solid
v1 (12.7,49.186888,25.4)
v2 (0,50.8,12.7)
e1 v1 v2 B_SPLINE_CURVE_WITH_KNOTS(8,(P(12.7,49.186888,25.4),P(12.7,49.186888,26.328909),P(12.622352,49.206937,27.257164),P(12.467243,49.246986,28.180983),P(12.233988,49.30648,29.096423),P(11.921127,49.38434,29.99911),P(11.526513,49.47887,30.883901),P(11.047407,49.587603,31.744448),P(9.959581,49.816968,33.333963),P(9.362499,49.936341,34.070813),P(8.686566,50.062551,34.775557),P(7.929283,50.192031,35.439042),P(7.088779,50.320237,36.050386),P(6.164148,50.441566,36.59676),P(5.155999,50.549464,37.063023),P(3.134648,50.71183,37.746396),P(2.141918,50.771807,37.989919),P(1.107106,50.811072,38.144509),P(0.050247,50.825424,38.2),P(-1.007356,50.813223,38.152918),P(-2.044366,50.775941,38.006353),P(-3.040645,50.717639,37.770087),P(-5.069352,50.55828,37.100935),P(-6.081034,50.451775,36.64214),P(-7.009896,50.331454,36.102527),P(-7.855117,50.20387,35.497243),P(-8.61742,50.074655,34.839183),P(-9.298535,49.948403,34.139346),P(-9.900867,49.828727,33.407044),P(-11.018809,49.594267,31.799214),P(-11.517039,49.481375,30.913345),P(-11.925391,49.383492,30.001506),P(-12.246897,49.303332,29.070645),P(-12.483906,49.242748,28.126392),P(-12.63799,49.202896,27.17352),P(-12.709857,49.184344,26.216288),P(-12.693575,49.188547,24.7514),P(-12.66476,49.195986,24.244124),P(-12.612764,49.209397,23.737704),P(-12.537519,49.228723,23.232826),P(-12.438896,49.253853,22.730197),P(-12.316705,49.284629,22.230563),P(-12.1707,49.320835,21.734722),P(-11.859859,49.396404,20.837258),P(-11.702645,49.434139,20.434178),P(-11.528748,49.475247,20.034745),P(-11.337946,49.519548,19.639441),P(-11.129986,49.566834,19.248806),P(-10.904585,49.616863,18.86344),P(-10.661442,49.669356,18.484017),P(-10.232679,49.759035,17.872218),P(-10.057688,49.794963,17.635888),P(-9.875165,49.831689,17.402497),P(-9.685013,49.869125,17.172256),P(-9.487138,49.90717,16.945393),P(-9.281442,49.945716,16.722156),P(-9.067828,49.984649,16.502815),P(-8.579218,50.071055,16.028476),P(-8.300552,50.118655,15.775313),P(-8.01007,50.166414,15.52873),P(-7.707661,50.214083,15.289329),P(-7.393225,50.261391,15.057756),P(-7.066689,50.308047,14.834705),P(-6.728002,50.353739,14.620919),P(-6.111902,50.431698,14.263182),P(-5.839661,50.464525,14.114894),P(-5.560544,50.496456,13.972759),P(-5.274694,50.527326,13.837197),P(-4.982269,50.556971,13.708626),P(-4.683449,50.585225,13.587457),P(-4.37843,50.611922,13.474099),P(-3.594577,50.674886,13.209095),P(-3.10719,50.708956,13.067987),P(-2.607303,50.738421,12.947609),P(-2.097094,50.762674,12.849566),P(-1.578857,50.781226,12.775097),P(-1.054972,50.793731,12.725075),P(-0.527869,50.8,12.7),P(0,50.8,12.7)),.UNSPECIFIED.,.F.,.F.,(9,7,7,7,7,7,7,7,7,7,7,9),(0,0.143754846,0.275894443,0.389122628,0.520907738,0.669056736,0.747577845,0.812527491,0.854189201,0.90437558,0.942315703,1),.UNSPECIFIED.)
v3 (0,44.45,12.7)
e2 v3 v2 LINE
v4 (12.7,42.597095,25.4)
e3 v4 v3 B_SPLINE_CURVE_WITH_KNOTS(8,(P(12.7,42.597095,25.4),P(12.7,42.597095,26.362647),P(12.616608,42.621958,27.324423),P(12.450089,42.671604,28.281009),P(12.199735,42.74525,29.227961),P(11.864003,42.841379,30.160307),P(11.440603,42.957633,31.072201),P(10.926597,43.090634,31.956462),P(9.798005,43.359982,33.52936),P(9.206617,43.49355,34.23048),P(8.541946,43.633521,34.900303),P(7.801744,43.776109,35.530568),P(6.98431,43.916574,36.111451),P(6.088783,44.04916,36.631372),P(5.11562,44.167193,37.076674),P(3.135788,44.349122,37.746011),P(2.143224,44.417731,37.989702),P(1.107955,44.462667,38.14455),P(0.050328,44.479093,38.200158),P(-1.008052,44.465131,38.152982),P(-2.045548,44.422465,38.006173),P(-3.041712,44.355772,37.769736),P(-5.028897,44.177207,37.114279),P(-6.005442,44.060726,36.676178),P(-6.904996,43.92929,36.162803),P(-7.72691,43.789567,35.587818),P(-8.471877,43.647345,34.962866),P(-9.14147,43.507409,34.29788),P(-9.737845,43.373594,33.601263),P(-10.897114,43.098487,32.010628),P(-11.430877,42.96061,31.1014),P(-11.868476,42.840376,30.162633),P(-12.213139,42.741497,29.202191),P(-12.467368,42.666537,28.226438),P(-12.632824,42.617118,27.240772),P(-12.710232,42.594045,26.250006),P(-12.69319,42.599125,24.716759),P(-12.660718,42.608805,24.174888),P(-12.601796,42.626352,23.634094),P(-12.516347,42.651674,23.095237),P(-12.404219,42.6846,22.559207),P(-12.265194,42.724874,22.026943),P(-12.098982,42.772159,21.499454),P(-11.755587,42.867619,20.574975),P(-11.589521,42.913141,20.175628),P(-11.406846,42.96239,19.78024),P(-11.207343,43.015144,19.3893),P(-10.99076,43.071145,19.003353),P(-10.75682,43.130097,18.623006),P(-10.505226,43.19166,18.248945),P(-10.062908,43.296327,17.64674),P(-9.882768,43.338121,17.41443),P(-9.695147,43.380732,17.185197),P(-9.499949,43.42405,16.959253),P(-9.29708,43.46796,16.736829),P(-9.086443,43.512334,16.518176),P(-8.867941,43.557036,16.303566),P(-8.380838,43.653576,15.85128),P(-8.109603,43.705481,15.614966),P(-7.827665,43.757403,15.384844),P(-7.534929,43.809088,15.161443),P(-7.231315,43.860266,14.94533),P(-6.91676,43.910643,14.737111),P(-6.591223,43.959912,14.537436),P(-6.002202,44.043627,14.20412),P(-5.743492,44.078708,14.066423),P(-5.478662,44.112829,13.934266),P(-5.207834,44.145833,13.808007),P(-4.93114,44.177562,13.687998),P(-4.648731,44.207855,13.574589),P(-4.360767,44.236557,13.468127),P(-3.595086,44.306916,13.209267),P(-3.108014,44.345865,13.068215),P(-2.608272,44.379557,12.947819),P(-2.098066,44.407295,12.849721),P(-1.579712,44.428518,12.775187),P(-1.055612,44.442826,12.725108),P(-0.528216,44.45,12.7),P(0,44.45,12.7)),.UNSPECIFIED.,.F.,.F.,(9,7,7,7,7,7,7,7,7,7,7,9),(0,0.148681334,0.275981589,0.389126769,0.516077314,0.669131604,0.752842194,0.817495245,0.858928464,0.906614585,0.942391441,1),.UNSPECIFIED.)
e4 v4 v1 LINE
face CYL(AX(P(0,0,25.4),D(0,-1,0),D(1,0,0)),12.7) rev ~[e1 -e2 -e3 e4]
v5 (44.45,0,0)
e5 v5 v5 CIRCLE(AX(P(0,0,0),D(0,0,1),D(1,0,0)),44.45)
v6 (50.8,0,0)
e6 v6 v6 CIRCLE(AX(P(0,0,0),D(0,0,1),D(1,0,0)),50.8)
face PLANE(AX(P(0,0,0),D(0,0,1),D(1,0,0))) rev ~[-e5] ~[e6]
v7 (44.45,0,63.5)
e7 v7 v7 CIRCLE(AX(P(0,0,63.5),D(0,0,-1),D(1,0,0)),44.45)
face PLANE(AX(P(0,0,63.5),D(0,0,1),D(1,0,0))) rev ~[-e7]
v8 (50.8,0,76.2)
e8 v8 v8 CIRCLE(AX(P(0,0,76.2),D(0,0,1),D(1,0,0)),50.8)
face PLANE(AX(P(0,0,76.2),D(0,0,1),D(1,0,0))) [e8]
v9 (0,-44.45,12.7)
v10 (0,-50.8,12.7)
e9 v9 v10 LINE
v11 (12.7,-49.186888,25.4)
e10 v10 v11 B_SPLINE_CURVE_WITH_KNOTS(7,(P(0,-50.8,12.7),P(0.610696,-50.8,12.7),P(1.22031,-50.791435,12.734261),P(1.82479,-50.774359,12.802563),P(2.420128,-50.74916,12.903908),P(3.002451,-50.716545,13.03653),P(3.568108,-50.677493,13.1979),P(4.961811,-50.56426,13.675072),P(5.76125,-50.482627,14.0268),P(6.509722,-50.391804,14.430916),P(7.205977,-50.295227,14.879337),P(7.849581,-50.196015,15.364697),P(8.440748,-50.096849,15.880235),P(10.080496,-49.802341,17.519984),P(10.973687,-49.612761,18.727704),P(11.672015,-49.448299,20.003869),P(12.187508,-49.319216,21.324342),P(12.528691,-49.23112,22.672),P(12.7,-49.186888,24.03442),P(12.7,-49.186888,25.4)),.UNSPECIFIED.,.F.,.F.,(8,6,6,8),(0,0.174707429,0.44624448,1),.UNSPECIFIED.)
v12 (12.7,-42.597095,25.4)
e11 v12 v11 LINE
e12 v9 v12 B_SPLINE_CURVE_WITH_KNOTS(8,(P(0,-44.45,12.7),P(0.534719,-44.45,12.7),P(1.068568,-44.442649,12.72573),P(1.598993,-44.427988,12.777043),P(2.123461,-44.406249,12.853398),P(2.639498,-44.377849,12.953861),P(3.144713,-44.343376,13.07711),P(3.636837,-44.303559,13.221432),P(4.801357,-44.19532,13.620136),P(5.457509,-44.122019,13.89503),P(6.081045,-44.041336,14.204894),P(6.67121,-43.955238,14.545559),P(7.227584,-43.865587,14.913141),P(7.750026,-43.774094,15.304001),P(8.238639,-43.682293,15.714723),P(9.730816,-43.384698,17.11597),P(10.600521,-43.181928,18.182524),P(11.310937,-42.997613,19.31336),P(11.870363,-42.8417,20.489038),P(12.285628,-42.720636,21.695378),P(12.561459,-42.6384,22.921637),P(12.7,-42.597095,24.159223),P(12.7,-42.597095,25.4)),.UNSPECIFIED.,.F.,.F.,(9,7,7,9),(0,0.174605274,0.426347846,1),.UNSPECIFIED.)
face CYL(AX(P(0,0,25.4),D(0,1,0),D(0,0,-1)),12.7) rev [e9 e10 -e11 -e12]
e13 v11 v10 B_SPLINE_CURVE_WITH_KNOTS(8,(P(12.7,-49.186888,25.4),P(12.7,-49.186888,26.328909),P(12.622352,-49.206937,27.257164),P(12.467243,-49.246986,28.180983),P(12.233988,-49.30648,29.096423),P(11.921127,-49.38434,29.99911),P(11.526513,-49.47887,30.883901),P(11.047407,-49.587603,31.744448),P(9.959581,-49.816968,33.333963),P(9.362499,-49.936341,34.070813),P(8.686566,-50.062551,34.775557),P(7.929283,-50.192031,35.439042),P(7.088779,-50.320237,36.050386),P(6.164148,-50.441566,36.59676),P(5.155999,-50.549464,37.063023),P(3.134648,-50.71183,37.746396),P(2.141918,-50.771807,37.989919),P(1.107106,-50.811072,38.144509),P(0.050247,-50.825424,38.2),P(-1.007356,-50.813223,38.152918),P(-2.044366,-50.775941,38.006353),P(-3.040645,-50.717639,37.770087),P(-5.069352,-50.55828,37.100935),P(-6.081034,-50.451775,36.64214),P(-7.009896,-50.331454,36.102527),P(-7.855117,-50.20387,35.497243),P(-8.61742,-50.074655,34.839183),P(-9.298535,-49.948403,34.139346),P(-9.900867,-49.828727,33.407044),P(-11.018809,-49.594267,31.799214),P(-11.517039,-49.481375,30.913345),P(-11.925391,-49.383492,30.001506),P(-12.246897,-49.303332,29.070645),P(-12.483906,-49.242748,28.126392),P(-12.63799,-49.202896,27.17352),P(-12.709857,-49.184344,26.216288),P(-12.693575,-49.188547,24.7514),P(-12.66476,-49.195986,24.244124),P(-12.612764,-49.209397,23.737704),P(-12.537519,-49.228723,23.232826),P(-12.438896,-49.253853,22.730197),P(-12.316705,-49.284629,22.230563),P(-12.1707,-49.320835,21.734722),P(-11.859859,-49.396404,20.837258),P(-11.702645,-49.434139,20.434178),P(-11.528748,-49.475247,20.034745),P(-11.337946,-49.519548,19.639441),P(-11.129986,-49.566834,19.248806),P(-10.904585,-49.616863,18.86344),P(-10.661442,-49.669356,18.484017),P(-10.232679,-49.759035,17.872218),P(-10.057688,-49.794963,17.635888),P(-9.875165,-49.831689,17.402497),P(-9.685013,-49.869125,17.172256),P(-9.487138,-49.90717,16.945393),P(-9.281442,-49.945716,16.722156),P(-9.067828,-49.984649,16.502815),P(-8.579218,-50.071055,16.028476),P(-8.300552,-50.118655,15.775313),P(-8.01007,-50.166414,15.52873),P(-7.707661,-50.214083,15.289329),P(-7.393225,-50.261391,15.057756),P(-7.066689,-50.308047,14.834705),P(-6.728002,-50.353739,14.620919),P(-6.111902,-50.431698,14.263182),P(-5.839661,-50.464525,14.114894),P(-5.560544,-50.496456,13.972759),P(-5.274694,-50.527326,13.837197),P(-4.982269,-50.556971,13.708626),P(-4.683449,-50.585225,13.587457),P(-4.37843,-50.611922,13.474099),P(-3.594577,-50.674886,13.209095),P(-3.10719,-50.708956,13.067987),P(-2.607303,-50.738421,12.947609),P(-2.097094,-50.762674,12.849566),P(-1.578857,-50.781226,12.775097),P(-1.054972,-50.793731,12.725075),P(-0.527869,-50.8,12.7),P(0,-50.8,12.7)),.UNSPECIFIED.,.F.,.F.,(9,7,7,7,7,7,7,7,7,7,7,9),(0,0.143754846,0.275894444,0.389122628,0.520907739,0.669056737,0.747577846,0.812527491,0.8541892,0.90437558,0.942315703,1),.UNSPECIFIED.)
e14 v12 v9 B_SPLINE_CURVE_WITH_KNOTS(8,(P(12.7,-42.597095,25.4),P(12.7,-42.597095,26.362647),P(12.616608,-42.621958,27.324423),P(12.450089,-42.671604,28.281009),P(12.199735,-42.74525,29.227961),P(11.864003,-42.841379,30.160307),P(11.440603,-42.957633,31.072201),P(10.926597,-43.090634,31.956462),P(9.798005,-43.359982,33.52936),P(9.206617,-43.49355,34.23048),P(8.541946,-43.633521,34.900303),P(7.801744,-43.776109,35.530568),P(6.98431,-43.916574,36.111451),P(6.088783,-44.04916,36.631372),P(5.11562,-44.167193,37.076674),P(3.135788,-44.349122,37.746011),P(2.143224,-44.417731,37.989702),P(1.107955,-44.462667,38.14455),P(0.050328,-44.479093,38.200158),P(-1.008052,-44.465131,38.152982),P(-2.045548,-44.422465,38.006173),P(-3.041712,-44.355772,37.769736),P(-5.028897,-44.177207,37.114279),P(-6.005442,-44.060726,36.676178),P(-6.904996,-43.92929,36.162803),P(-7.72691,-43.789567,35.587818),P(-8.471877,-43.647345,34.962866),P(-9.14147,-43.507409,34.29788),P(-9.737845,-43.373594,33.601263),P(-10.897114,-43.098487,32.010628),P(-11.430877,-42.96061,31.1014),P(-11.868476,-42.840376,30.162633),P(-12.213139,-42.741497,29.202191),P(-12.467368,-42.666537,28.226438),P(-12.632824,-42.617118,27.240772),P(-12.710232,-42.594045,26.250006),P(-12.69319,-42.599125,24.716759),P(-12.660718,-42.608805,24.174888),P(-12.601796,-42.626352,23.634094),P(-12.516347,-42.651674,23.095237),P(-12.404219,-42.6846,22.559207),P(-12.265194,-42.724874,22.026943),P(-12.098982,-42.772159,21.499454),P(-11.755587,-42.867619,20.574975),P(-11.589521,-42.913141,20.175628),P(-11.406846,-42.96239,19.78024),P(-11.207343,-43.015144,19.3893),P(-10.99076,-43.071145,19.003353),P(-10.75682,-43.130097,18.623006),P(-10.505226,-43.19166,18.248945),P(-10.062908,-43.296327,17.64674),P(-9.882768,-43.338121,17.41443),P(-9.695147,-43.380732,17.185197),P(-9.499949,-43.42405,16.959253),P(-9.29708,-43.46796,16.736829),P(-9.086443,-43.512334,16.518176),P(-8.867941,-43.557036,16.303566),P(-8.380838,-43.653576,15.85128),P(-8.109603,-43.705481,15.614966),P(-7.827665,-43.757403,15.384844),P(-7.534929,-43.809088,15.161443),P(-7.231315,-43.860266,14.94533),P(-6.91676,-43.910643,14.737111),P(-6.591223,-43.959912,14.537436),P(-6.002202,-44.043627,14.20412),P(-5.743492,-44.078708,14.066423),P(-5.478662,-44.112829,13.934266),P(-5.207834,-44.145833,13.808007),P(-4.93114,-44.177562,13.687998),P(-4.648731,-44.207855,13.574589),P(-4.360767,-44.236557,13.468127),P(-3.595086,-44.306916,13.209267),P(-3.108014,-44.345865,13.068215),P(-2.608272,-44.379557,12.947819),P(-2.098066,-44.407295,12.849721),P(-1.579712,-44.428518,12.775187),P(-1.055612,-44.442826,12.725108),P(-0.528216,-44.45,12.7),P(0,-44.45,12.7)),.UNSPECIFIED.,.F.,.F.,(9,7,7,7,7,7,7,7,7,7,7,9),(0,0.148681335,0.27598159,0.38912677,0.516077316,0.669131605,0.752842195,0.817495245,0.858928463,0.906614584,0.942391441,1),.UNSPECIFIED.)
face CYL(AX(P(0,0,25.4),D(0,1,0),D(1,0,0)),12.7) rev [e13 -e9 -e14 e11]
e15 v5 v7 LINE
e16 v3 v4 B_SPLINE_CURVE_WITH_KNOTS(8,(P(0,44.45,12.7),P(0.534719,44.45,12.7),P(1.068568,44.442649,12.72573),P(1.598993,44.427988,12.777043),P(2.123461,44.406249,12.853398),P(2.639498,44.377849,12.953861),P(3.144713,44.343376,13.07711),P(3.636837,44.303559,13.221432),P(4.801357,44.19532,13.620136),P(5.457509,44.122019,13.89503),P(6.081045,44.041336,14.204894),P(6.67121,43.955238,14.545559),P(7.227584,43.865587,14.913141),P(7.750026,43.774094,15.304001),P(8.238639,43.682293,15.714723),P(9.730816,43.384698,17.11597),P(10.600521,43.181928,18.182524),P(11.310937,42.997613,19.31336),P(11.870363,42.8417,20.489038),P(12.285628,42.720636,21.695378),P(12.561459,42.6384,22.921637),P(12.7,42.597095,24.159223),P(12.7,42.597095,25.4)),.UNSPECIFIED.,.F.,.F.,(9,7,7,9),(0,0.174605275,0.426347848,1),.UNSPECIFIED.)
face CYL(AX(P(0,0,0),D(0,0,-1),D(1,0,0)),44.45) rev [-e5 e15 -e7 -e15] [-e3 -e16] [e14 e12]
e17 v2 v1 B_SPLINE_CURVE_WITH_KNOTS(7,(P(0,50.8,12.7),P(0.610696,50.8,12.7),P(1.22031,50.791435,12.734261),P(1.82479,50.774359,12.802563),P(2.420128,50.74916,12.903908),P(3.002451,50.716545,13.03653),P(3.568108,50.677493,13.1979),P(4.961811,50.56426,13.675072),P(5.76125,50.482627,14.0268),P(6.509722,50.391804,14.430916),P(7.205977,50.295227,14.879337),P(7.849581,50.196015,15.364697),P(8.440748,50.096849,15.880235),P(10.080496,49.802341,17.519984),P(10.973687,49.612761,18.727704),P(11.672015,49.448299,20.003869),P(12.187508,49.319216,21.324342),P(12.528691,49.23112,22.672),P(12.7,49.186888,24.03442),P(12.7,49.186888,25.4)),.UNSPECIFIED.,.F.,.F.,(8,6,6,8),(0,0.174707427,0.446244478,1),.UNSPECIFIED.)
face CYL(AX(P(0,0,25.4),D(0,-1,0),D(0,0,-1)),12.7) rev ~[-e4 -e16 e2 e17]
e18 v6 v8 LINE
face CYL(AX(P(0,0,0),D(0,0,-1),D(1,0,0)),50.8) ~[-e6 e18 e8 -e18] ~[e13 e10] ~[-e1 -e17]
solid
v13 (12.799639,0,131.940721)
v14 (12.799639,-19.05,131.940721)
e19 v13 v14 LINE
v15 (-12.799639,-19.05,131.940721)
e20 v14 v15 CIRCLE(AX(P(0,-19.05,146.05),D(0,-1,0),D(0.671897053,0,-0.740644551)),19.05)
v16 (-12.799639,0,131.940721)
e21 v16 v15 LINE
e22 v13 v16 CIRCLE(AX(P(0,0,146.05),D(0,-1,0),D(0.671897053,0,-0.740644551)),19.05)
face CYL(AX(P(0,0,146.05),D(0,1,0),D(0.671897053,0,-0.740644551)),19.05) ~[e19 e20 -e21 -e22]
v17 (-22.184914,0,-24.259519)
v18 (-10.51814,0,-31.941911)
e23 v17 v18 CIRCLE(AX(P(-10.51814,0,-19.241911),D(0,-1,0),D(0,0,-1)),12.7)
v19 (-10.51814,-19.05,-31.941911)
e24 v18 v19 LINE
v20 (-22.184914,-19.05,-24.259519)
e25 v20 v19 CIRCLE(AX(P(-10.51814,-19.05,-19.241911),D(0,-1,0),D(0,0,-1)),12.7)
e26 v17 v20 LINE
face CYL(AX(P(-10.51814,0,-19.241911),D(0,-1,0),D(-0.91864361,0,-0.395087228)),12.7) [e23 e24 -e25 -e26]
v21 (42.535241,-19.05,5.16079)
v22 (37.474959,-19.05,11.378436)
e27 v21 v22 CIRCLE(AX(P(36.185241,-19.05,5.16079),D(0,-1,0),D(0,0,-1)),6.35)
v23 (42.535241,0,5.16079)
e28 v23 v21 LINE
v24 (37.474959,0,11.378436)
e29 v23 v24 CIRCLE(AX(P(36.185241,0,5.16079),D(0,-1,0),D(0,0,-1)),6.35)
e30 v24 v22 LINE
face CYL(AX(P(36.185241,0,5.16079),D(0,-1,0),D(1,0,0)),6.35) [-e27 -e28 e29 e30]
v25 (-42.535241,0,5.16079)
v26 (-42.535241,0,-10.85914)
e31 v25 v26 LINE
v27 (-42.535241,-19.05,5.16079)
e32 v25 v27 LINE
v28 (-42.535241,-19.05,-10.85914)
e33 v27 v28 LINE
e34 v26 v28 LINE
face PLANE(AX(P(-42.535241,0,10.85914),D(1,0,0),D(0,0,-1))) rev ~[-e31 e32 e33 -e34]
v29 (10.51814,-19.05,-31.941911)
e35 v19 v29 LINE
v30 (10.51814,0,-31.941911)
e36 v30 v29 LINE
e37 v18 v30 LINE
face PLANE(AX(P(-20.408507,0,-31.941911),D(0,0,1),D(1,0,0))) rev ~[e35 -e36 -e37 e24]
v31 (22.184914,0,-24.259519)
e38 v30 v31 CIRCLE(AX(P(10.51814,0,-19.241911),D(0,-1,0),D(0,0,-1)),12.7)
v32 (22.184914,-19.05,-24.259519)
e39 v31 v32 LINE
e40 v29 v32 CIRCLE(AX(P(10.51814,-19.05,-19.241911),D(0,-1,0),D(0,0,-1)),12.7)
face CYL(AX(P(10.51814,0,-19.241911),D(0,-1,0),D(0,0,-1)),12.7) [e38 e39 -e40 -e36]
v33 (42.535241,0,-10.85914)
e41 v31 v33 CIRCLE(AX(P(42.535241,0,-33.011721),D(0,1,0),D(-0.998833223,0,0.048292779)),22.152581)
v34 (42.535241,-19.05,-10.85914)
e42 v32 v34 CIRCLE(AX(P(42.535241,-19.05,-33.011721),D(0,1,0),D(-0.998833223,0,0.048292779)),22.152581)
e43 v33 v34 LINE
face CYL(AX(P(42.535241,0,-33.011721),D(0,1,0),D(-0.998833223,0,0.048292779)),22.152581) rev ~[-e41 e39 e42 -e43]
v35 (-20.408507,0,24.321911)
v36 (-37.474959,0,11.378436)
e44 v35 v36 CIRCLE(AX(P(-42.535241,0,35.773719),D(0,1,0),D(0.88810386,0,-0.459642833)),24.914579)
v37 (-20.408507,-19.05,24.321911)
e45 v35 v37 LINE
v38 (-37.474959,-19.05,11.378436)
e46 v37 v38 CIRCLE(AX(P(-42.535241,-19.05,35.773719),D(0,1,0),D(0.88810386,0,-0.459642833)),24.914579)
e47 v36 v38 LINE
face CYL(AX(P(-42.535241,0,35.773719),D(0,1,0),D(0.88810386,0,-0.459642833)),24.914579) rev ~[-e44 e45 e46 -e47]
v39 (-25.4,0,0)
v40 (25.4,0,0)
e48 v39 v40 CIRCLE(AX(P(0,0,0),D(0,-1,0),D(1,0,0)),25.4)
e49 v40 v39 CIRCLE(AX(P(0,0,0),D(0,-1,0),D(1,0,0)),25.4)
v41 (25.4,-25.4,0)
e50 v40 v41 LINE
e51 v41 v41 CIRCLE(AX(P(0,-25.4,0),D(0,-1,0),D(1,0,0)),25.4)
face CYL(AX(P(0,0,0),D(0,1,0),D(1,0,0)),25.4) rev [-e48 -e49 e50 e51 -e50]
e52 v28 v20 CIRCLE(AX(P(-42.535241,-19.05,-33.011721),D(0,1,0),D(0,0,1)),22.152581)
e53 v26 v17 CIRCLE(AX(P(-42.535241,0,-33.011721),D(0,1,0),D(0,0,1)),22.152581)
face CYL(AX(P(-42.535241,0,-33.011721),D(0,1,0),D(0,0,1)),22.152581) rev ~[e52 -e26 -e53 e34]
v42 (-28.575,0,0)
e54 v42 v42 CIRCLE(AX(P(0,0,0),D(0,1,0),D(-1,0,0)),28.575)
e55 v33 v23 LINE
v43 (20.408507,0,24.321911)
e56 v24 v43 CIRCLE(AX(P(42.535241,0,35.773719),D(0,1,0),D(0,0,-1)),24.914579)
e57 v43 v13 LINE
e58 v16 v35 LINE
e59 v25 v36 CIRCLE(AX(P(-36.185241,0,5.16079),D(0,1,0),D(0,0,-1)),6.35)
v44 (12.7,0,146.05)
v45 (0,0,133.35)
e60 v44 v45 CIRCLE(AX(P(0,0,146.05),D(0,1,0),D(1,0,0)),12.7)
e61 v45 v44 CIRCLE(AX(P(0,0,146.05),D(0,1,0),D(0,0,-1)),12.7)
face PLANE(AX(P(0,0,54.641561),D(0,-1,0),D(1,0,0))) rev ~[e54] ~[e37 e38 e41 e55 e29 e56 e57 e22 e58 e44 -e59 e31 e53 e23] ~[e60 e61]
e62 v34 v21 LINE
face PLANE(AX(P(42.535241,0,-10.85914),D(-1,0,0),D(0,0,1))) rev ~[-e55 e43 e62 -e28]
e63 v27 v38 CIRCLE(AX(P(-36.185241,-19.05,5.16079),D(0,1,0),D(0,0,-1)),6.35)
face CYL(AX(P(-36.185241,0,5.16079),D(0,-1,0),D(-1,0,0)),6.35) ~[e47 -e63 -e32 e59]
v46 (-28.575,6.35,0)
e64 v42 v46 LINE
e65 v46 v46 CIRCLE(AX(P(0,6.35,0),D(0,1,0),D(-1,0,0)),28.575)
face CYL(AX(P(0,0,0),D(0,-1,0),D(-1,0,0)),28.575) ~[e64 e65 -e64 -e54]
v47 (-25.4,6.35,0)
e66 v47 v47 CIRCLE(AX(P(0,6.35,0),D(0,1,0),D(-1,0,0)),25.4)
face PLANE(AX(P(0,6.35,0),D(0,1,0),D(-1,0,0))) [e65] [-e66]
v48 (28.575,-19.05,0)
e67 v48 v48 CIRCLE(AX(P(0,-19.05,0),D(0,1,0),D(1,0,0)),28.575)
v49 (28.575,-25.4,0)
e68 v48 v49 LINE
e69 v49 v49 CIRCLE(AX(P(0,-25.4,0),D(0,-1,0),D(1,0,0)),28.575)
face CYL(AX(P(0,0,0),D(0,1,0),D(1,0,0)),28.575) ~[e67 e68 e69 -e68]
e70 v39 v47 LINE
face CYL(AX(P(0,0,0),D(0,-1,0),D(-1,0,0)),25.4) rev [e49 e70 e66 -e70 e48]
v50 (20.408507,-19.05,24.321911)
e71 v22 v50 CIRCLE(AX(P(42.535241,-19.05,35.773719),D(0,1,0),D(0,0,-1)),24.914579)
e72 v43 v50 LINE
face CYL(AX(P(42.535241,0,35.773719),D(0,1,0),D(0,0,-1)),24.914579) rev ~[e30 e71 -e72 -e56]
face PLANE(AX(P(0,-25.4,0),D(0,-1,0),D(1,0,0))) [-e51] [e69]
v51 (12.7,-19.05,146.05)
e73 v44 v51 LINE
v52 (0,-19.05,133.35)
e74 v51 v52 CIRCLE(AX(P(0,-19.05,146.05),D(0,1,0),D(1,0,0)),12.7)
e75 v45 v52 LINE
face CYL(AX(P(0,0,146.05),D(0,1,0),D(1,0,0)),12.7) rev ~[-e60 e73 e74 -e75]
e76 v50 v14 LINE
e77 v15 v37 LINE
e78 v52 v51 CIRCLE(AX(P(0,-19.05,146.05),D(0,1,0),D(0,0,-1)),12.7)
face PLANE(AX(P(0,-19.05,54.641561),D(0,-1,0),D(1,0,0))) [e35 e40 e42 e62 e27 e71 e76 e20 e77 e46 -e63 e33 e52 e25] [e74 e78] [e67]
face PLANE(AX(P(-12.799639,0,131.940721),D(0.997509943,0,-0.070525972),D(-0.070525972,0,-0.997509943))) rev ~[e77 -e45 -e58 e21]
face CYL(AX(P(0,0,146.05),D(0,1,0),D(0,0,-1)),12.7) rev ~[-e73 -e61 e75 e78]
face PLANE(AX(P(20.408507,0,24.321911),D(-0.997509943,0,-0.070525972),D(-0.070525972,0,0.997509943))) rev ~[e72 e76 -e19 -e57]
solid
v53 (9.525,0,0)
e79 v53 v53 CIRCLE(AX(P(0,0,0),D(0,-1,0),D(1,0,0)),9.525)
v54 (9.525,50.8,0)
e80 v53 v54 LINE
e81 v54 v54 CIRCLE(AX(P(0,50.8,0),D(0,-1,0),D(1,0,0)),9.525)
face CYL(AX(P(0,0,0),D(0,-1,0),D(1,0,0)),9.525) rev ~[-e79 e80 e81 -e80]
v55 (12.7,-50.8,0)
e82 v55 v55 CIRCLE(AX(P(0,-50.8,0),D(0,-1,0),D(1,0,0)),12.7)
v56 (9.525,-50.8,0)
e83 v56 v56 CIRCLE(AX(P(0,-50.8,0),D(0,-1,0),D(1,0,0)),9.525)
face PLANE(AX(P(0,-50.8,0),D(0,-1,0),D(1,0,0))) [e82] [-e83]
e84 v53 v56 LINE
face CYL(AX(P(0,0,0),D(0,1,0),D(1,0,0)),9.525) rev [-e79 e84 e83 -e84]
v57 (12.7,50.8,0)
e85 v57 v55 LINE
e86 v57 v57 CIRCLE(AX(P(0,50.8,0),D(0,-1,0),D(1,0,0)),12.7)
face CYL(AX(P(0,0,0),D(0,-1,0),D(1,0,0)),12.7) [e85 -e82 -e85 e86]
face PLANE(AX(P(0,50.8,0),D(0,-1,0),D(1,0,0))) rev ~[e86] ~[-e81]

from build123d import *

# Parameters (mm, degrees)
F1_DEPTH       = 19.05
F2_R           = 28.575
F2_R_2         = 25.4
F3_DEPTH       = 25.4
F4_R           = 28.575
F4_R_2         = 25.4
F5_DEPTH       = 6.35
F6_R           = 12.7
F7_R           = 6.35
F8_R           = 12.7
F8_R_2         = 9.525
F9_DEPTH       = 50.8
F9_DEPTH_BACK  = 50.8
F10_R          = 50.8
F10_R_2        = 44.45
F11_DEPTH      = 76.2
F12_R          = 50.8
F13_DEPTH      = 12.7
F15_DEPTH      = 72.136
F15_DEPTH_BACK = 101.346


with BuildPart() as f1:
    # F0 (on Front) → F1 (new body)
    with BuildSketch(Plane.XZ):
        with BuildLine():
            Line((-12.7996388564, 131.9407213102), (-20.4085066075, 24.321911069))
            ThreePointArc((-20.4085066075, 24.321911069), (-29.5849648539, 14.4892969079), (-42.53524071, 10.8591395506))
            Line((-42.53524071, 10.8591395506), (-42.53524071, -10.8591395506))
            ThreePointArc((-42.53524071, -10.8591395506), (-27.2539153671, -16.9737049796), (-20.4085066075, -31.941911069))
            Line((-20.4085066075, -31.941911069), (20.4085066075, -31.941911069))
            ThreePointArc((20.4085066075, -31.941911069), (27.2539153671, -16.9737049796), (42.53524071, -10.8591395506))
            Line((42.53524071, -10.8591395506), (42.53524071, 10.8591395506))
            ThreePointArc((42.53524071, 10.8591395506), (29.5849648539, 14.4892969079), (20.4085066075, 24.321911069))
            Line((20.4085066075, 24.321911069), (12.7996388564, 131.9407213102))
            ThreePointArc((12.7996388564, 131.9407213102), (0, 165.1), (-12.7996388564, 131.9407213102))
        make_face()
        with BuildLine():
            ThreePointArc((0, -28.575), (-20.2055762724, 20.2055762724), (28.575, 0))
            ThreePointArc((28.575, 0), (20.2055762724, -20.2055762724), (0, -28.575))
        make_face(mode=Mode.SUBTRACT)
        with BuildLine():
            ThreePointArc((0, 133.35), (-8.9802561211, 155.0302561211), (12.7, 146.05))
            ThreePointArc((12.7, 146.05), (8.9802561211, 137.0697438789), (0, 133.35))
        make_face(mode=Mode.SUBTRACT)
    extrude(amount=F1_DEPTH)

    # F2 (on Front) → F3 (join)
    with BuildSketch(Plane.XZ):
        Circle(F2_R)
        Circle(F2_R_2, mode=Mode.SUBTRACT)
    extrude(amount=F3_DEPTH)

    # F4 (on face) → F5 (join)
    with BuildSketch(Plane(origin=(0, 0, 0), x_dir=(-1, 0, 0), z_dir=(0, 1, 0))):
        Circle(F4_R)
        Circle(F4_R_2, mode=Mode.SUBTRACT)
    extrude(amount=F5_DEPTH)

    # F6
    f6_edges = [f1.edges().sort_by_distance(p)[0] for p in [
        (20.408507, -9.525, -31.941911),
        (-20.408507, -9.525, -31.941911),
    ]]
    fillet(f6_edges, radius=F6_R)

    # F7
    f7_edges = [f1.edges().sort_by_distance(p)[0] for p in [
        (42.535241, -9.525, 10.85914),
        (-42.535241, -9.525, 10.85914),
    ]]
    fillet(f7_edges, radius=F7_R)


with BuildPart() as f9:
    # F8 (on Front) → F9 (new body, two sides)
    with BuildSketch(Plane.XZ) as f9_sk:
        Circle(F8_R)
        Circle(F8_R_2, mode=Mode.SUBTRACT)
    extrude(amount=F9_DEPTH)
    extrude(f9_sk.sketch, amount=-F9_DEPTH_BACK)


with BuildPart() as f11:
    # F10 (on Top) → F11 (new body)
    with BuildSketch(Plane.XY):
        Circle(F10_R)
        Circle(F10_R_2, mode=Mode.SUBTRACT)
    extrude(amount=F11_DEPTH)

    # F12 (on face) → F13 (join)
    with BuildSketch(Plane.XY.offset(76.2)):
        Circle(F12_R)
    extrude(amount=-F13_DEPTH)

    # F14 (on Front) → F15 (cut, two sides)
    with BuildSketch(Plane.XZ) as f15_sk:
        with BuildLine():
            ThreePointArc((0, 12.7), (8.9802561211, 16.4197438789), (12.7, 25.4))
            ThreePointArc((12.7, 25.4), (-8.9802561211, 34.3802561211), (0, 12.7))
        make_face()
    extrude(amount=-F15_DEPTH, mode=Mode.SUBTRACT)
    extrude(f15_sk.sketch, amount=F15_DEPTH_BACK, mode=Mode.SUBTRACT)


solid = Compound([f1.part, f9.part, f11.part])
